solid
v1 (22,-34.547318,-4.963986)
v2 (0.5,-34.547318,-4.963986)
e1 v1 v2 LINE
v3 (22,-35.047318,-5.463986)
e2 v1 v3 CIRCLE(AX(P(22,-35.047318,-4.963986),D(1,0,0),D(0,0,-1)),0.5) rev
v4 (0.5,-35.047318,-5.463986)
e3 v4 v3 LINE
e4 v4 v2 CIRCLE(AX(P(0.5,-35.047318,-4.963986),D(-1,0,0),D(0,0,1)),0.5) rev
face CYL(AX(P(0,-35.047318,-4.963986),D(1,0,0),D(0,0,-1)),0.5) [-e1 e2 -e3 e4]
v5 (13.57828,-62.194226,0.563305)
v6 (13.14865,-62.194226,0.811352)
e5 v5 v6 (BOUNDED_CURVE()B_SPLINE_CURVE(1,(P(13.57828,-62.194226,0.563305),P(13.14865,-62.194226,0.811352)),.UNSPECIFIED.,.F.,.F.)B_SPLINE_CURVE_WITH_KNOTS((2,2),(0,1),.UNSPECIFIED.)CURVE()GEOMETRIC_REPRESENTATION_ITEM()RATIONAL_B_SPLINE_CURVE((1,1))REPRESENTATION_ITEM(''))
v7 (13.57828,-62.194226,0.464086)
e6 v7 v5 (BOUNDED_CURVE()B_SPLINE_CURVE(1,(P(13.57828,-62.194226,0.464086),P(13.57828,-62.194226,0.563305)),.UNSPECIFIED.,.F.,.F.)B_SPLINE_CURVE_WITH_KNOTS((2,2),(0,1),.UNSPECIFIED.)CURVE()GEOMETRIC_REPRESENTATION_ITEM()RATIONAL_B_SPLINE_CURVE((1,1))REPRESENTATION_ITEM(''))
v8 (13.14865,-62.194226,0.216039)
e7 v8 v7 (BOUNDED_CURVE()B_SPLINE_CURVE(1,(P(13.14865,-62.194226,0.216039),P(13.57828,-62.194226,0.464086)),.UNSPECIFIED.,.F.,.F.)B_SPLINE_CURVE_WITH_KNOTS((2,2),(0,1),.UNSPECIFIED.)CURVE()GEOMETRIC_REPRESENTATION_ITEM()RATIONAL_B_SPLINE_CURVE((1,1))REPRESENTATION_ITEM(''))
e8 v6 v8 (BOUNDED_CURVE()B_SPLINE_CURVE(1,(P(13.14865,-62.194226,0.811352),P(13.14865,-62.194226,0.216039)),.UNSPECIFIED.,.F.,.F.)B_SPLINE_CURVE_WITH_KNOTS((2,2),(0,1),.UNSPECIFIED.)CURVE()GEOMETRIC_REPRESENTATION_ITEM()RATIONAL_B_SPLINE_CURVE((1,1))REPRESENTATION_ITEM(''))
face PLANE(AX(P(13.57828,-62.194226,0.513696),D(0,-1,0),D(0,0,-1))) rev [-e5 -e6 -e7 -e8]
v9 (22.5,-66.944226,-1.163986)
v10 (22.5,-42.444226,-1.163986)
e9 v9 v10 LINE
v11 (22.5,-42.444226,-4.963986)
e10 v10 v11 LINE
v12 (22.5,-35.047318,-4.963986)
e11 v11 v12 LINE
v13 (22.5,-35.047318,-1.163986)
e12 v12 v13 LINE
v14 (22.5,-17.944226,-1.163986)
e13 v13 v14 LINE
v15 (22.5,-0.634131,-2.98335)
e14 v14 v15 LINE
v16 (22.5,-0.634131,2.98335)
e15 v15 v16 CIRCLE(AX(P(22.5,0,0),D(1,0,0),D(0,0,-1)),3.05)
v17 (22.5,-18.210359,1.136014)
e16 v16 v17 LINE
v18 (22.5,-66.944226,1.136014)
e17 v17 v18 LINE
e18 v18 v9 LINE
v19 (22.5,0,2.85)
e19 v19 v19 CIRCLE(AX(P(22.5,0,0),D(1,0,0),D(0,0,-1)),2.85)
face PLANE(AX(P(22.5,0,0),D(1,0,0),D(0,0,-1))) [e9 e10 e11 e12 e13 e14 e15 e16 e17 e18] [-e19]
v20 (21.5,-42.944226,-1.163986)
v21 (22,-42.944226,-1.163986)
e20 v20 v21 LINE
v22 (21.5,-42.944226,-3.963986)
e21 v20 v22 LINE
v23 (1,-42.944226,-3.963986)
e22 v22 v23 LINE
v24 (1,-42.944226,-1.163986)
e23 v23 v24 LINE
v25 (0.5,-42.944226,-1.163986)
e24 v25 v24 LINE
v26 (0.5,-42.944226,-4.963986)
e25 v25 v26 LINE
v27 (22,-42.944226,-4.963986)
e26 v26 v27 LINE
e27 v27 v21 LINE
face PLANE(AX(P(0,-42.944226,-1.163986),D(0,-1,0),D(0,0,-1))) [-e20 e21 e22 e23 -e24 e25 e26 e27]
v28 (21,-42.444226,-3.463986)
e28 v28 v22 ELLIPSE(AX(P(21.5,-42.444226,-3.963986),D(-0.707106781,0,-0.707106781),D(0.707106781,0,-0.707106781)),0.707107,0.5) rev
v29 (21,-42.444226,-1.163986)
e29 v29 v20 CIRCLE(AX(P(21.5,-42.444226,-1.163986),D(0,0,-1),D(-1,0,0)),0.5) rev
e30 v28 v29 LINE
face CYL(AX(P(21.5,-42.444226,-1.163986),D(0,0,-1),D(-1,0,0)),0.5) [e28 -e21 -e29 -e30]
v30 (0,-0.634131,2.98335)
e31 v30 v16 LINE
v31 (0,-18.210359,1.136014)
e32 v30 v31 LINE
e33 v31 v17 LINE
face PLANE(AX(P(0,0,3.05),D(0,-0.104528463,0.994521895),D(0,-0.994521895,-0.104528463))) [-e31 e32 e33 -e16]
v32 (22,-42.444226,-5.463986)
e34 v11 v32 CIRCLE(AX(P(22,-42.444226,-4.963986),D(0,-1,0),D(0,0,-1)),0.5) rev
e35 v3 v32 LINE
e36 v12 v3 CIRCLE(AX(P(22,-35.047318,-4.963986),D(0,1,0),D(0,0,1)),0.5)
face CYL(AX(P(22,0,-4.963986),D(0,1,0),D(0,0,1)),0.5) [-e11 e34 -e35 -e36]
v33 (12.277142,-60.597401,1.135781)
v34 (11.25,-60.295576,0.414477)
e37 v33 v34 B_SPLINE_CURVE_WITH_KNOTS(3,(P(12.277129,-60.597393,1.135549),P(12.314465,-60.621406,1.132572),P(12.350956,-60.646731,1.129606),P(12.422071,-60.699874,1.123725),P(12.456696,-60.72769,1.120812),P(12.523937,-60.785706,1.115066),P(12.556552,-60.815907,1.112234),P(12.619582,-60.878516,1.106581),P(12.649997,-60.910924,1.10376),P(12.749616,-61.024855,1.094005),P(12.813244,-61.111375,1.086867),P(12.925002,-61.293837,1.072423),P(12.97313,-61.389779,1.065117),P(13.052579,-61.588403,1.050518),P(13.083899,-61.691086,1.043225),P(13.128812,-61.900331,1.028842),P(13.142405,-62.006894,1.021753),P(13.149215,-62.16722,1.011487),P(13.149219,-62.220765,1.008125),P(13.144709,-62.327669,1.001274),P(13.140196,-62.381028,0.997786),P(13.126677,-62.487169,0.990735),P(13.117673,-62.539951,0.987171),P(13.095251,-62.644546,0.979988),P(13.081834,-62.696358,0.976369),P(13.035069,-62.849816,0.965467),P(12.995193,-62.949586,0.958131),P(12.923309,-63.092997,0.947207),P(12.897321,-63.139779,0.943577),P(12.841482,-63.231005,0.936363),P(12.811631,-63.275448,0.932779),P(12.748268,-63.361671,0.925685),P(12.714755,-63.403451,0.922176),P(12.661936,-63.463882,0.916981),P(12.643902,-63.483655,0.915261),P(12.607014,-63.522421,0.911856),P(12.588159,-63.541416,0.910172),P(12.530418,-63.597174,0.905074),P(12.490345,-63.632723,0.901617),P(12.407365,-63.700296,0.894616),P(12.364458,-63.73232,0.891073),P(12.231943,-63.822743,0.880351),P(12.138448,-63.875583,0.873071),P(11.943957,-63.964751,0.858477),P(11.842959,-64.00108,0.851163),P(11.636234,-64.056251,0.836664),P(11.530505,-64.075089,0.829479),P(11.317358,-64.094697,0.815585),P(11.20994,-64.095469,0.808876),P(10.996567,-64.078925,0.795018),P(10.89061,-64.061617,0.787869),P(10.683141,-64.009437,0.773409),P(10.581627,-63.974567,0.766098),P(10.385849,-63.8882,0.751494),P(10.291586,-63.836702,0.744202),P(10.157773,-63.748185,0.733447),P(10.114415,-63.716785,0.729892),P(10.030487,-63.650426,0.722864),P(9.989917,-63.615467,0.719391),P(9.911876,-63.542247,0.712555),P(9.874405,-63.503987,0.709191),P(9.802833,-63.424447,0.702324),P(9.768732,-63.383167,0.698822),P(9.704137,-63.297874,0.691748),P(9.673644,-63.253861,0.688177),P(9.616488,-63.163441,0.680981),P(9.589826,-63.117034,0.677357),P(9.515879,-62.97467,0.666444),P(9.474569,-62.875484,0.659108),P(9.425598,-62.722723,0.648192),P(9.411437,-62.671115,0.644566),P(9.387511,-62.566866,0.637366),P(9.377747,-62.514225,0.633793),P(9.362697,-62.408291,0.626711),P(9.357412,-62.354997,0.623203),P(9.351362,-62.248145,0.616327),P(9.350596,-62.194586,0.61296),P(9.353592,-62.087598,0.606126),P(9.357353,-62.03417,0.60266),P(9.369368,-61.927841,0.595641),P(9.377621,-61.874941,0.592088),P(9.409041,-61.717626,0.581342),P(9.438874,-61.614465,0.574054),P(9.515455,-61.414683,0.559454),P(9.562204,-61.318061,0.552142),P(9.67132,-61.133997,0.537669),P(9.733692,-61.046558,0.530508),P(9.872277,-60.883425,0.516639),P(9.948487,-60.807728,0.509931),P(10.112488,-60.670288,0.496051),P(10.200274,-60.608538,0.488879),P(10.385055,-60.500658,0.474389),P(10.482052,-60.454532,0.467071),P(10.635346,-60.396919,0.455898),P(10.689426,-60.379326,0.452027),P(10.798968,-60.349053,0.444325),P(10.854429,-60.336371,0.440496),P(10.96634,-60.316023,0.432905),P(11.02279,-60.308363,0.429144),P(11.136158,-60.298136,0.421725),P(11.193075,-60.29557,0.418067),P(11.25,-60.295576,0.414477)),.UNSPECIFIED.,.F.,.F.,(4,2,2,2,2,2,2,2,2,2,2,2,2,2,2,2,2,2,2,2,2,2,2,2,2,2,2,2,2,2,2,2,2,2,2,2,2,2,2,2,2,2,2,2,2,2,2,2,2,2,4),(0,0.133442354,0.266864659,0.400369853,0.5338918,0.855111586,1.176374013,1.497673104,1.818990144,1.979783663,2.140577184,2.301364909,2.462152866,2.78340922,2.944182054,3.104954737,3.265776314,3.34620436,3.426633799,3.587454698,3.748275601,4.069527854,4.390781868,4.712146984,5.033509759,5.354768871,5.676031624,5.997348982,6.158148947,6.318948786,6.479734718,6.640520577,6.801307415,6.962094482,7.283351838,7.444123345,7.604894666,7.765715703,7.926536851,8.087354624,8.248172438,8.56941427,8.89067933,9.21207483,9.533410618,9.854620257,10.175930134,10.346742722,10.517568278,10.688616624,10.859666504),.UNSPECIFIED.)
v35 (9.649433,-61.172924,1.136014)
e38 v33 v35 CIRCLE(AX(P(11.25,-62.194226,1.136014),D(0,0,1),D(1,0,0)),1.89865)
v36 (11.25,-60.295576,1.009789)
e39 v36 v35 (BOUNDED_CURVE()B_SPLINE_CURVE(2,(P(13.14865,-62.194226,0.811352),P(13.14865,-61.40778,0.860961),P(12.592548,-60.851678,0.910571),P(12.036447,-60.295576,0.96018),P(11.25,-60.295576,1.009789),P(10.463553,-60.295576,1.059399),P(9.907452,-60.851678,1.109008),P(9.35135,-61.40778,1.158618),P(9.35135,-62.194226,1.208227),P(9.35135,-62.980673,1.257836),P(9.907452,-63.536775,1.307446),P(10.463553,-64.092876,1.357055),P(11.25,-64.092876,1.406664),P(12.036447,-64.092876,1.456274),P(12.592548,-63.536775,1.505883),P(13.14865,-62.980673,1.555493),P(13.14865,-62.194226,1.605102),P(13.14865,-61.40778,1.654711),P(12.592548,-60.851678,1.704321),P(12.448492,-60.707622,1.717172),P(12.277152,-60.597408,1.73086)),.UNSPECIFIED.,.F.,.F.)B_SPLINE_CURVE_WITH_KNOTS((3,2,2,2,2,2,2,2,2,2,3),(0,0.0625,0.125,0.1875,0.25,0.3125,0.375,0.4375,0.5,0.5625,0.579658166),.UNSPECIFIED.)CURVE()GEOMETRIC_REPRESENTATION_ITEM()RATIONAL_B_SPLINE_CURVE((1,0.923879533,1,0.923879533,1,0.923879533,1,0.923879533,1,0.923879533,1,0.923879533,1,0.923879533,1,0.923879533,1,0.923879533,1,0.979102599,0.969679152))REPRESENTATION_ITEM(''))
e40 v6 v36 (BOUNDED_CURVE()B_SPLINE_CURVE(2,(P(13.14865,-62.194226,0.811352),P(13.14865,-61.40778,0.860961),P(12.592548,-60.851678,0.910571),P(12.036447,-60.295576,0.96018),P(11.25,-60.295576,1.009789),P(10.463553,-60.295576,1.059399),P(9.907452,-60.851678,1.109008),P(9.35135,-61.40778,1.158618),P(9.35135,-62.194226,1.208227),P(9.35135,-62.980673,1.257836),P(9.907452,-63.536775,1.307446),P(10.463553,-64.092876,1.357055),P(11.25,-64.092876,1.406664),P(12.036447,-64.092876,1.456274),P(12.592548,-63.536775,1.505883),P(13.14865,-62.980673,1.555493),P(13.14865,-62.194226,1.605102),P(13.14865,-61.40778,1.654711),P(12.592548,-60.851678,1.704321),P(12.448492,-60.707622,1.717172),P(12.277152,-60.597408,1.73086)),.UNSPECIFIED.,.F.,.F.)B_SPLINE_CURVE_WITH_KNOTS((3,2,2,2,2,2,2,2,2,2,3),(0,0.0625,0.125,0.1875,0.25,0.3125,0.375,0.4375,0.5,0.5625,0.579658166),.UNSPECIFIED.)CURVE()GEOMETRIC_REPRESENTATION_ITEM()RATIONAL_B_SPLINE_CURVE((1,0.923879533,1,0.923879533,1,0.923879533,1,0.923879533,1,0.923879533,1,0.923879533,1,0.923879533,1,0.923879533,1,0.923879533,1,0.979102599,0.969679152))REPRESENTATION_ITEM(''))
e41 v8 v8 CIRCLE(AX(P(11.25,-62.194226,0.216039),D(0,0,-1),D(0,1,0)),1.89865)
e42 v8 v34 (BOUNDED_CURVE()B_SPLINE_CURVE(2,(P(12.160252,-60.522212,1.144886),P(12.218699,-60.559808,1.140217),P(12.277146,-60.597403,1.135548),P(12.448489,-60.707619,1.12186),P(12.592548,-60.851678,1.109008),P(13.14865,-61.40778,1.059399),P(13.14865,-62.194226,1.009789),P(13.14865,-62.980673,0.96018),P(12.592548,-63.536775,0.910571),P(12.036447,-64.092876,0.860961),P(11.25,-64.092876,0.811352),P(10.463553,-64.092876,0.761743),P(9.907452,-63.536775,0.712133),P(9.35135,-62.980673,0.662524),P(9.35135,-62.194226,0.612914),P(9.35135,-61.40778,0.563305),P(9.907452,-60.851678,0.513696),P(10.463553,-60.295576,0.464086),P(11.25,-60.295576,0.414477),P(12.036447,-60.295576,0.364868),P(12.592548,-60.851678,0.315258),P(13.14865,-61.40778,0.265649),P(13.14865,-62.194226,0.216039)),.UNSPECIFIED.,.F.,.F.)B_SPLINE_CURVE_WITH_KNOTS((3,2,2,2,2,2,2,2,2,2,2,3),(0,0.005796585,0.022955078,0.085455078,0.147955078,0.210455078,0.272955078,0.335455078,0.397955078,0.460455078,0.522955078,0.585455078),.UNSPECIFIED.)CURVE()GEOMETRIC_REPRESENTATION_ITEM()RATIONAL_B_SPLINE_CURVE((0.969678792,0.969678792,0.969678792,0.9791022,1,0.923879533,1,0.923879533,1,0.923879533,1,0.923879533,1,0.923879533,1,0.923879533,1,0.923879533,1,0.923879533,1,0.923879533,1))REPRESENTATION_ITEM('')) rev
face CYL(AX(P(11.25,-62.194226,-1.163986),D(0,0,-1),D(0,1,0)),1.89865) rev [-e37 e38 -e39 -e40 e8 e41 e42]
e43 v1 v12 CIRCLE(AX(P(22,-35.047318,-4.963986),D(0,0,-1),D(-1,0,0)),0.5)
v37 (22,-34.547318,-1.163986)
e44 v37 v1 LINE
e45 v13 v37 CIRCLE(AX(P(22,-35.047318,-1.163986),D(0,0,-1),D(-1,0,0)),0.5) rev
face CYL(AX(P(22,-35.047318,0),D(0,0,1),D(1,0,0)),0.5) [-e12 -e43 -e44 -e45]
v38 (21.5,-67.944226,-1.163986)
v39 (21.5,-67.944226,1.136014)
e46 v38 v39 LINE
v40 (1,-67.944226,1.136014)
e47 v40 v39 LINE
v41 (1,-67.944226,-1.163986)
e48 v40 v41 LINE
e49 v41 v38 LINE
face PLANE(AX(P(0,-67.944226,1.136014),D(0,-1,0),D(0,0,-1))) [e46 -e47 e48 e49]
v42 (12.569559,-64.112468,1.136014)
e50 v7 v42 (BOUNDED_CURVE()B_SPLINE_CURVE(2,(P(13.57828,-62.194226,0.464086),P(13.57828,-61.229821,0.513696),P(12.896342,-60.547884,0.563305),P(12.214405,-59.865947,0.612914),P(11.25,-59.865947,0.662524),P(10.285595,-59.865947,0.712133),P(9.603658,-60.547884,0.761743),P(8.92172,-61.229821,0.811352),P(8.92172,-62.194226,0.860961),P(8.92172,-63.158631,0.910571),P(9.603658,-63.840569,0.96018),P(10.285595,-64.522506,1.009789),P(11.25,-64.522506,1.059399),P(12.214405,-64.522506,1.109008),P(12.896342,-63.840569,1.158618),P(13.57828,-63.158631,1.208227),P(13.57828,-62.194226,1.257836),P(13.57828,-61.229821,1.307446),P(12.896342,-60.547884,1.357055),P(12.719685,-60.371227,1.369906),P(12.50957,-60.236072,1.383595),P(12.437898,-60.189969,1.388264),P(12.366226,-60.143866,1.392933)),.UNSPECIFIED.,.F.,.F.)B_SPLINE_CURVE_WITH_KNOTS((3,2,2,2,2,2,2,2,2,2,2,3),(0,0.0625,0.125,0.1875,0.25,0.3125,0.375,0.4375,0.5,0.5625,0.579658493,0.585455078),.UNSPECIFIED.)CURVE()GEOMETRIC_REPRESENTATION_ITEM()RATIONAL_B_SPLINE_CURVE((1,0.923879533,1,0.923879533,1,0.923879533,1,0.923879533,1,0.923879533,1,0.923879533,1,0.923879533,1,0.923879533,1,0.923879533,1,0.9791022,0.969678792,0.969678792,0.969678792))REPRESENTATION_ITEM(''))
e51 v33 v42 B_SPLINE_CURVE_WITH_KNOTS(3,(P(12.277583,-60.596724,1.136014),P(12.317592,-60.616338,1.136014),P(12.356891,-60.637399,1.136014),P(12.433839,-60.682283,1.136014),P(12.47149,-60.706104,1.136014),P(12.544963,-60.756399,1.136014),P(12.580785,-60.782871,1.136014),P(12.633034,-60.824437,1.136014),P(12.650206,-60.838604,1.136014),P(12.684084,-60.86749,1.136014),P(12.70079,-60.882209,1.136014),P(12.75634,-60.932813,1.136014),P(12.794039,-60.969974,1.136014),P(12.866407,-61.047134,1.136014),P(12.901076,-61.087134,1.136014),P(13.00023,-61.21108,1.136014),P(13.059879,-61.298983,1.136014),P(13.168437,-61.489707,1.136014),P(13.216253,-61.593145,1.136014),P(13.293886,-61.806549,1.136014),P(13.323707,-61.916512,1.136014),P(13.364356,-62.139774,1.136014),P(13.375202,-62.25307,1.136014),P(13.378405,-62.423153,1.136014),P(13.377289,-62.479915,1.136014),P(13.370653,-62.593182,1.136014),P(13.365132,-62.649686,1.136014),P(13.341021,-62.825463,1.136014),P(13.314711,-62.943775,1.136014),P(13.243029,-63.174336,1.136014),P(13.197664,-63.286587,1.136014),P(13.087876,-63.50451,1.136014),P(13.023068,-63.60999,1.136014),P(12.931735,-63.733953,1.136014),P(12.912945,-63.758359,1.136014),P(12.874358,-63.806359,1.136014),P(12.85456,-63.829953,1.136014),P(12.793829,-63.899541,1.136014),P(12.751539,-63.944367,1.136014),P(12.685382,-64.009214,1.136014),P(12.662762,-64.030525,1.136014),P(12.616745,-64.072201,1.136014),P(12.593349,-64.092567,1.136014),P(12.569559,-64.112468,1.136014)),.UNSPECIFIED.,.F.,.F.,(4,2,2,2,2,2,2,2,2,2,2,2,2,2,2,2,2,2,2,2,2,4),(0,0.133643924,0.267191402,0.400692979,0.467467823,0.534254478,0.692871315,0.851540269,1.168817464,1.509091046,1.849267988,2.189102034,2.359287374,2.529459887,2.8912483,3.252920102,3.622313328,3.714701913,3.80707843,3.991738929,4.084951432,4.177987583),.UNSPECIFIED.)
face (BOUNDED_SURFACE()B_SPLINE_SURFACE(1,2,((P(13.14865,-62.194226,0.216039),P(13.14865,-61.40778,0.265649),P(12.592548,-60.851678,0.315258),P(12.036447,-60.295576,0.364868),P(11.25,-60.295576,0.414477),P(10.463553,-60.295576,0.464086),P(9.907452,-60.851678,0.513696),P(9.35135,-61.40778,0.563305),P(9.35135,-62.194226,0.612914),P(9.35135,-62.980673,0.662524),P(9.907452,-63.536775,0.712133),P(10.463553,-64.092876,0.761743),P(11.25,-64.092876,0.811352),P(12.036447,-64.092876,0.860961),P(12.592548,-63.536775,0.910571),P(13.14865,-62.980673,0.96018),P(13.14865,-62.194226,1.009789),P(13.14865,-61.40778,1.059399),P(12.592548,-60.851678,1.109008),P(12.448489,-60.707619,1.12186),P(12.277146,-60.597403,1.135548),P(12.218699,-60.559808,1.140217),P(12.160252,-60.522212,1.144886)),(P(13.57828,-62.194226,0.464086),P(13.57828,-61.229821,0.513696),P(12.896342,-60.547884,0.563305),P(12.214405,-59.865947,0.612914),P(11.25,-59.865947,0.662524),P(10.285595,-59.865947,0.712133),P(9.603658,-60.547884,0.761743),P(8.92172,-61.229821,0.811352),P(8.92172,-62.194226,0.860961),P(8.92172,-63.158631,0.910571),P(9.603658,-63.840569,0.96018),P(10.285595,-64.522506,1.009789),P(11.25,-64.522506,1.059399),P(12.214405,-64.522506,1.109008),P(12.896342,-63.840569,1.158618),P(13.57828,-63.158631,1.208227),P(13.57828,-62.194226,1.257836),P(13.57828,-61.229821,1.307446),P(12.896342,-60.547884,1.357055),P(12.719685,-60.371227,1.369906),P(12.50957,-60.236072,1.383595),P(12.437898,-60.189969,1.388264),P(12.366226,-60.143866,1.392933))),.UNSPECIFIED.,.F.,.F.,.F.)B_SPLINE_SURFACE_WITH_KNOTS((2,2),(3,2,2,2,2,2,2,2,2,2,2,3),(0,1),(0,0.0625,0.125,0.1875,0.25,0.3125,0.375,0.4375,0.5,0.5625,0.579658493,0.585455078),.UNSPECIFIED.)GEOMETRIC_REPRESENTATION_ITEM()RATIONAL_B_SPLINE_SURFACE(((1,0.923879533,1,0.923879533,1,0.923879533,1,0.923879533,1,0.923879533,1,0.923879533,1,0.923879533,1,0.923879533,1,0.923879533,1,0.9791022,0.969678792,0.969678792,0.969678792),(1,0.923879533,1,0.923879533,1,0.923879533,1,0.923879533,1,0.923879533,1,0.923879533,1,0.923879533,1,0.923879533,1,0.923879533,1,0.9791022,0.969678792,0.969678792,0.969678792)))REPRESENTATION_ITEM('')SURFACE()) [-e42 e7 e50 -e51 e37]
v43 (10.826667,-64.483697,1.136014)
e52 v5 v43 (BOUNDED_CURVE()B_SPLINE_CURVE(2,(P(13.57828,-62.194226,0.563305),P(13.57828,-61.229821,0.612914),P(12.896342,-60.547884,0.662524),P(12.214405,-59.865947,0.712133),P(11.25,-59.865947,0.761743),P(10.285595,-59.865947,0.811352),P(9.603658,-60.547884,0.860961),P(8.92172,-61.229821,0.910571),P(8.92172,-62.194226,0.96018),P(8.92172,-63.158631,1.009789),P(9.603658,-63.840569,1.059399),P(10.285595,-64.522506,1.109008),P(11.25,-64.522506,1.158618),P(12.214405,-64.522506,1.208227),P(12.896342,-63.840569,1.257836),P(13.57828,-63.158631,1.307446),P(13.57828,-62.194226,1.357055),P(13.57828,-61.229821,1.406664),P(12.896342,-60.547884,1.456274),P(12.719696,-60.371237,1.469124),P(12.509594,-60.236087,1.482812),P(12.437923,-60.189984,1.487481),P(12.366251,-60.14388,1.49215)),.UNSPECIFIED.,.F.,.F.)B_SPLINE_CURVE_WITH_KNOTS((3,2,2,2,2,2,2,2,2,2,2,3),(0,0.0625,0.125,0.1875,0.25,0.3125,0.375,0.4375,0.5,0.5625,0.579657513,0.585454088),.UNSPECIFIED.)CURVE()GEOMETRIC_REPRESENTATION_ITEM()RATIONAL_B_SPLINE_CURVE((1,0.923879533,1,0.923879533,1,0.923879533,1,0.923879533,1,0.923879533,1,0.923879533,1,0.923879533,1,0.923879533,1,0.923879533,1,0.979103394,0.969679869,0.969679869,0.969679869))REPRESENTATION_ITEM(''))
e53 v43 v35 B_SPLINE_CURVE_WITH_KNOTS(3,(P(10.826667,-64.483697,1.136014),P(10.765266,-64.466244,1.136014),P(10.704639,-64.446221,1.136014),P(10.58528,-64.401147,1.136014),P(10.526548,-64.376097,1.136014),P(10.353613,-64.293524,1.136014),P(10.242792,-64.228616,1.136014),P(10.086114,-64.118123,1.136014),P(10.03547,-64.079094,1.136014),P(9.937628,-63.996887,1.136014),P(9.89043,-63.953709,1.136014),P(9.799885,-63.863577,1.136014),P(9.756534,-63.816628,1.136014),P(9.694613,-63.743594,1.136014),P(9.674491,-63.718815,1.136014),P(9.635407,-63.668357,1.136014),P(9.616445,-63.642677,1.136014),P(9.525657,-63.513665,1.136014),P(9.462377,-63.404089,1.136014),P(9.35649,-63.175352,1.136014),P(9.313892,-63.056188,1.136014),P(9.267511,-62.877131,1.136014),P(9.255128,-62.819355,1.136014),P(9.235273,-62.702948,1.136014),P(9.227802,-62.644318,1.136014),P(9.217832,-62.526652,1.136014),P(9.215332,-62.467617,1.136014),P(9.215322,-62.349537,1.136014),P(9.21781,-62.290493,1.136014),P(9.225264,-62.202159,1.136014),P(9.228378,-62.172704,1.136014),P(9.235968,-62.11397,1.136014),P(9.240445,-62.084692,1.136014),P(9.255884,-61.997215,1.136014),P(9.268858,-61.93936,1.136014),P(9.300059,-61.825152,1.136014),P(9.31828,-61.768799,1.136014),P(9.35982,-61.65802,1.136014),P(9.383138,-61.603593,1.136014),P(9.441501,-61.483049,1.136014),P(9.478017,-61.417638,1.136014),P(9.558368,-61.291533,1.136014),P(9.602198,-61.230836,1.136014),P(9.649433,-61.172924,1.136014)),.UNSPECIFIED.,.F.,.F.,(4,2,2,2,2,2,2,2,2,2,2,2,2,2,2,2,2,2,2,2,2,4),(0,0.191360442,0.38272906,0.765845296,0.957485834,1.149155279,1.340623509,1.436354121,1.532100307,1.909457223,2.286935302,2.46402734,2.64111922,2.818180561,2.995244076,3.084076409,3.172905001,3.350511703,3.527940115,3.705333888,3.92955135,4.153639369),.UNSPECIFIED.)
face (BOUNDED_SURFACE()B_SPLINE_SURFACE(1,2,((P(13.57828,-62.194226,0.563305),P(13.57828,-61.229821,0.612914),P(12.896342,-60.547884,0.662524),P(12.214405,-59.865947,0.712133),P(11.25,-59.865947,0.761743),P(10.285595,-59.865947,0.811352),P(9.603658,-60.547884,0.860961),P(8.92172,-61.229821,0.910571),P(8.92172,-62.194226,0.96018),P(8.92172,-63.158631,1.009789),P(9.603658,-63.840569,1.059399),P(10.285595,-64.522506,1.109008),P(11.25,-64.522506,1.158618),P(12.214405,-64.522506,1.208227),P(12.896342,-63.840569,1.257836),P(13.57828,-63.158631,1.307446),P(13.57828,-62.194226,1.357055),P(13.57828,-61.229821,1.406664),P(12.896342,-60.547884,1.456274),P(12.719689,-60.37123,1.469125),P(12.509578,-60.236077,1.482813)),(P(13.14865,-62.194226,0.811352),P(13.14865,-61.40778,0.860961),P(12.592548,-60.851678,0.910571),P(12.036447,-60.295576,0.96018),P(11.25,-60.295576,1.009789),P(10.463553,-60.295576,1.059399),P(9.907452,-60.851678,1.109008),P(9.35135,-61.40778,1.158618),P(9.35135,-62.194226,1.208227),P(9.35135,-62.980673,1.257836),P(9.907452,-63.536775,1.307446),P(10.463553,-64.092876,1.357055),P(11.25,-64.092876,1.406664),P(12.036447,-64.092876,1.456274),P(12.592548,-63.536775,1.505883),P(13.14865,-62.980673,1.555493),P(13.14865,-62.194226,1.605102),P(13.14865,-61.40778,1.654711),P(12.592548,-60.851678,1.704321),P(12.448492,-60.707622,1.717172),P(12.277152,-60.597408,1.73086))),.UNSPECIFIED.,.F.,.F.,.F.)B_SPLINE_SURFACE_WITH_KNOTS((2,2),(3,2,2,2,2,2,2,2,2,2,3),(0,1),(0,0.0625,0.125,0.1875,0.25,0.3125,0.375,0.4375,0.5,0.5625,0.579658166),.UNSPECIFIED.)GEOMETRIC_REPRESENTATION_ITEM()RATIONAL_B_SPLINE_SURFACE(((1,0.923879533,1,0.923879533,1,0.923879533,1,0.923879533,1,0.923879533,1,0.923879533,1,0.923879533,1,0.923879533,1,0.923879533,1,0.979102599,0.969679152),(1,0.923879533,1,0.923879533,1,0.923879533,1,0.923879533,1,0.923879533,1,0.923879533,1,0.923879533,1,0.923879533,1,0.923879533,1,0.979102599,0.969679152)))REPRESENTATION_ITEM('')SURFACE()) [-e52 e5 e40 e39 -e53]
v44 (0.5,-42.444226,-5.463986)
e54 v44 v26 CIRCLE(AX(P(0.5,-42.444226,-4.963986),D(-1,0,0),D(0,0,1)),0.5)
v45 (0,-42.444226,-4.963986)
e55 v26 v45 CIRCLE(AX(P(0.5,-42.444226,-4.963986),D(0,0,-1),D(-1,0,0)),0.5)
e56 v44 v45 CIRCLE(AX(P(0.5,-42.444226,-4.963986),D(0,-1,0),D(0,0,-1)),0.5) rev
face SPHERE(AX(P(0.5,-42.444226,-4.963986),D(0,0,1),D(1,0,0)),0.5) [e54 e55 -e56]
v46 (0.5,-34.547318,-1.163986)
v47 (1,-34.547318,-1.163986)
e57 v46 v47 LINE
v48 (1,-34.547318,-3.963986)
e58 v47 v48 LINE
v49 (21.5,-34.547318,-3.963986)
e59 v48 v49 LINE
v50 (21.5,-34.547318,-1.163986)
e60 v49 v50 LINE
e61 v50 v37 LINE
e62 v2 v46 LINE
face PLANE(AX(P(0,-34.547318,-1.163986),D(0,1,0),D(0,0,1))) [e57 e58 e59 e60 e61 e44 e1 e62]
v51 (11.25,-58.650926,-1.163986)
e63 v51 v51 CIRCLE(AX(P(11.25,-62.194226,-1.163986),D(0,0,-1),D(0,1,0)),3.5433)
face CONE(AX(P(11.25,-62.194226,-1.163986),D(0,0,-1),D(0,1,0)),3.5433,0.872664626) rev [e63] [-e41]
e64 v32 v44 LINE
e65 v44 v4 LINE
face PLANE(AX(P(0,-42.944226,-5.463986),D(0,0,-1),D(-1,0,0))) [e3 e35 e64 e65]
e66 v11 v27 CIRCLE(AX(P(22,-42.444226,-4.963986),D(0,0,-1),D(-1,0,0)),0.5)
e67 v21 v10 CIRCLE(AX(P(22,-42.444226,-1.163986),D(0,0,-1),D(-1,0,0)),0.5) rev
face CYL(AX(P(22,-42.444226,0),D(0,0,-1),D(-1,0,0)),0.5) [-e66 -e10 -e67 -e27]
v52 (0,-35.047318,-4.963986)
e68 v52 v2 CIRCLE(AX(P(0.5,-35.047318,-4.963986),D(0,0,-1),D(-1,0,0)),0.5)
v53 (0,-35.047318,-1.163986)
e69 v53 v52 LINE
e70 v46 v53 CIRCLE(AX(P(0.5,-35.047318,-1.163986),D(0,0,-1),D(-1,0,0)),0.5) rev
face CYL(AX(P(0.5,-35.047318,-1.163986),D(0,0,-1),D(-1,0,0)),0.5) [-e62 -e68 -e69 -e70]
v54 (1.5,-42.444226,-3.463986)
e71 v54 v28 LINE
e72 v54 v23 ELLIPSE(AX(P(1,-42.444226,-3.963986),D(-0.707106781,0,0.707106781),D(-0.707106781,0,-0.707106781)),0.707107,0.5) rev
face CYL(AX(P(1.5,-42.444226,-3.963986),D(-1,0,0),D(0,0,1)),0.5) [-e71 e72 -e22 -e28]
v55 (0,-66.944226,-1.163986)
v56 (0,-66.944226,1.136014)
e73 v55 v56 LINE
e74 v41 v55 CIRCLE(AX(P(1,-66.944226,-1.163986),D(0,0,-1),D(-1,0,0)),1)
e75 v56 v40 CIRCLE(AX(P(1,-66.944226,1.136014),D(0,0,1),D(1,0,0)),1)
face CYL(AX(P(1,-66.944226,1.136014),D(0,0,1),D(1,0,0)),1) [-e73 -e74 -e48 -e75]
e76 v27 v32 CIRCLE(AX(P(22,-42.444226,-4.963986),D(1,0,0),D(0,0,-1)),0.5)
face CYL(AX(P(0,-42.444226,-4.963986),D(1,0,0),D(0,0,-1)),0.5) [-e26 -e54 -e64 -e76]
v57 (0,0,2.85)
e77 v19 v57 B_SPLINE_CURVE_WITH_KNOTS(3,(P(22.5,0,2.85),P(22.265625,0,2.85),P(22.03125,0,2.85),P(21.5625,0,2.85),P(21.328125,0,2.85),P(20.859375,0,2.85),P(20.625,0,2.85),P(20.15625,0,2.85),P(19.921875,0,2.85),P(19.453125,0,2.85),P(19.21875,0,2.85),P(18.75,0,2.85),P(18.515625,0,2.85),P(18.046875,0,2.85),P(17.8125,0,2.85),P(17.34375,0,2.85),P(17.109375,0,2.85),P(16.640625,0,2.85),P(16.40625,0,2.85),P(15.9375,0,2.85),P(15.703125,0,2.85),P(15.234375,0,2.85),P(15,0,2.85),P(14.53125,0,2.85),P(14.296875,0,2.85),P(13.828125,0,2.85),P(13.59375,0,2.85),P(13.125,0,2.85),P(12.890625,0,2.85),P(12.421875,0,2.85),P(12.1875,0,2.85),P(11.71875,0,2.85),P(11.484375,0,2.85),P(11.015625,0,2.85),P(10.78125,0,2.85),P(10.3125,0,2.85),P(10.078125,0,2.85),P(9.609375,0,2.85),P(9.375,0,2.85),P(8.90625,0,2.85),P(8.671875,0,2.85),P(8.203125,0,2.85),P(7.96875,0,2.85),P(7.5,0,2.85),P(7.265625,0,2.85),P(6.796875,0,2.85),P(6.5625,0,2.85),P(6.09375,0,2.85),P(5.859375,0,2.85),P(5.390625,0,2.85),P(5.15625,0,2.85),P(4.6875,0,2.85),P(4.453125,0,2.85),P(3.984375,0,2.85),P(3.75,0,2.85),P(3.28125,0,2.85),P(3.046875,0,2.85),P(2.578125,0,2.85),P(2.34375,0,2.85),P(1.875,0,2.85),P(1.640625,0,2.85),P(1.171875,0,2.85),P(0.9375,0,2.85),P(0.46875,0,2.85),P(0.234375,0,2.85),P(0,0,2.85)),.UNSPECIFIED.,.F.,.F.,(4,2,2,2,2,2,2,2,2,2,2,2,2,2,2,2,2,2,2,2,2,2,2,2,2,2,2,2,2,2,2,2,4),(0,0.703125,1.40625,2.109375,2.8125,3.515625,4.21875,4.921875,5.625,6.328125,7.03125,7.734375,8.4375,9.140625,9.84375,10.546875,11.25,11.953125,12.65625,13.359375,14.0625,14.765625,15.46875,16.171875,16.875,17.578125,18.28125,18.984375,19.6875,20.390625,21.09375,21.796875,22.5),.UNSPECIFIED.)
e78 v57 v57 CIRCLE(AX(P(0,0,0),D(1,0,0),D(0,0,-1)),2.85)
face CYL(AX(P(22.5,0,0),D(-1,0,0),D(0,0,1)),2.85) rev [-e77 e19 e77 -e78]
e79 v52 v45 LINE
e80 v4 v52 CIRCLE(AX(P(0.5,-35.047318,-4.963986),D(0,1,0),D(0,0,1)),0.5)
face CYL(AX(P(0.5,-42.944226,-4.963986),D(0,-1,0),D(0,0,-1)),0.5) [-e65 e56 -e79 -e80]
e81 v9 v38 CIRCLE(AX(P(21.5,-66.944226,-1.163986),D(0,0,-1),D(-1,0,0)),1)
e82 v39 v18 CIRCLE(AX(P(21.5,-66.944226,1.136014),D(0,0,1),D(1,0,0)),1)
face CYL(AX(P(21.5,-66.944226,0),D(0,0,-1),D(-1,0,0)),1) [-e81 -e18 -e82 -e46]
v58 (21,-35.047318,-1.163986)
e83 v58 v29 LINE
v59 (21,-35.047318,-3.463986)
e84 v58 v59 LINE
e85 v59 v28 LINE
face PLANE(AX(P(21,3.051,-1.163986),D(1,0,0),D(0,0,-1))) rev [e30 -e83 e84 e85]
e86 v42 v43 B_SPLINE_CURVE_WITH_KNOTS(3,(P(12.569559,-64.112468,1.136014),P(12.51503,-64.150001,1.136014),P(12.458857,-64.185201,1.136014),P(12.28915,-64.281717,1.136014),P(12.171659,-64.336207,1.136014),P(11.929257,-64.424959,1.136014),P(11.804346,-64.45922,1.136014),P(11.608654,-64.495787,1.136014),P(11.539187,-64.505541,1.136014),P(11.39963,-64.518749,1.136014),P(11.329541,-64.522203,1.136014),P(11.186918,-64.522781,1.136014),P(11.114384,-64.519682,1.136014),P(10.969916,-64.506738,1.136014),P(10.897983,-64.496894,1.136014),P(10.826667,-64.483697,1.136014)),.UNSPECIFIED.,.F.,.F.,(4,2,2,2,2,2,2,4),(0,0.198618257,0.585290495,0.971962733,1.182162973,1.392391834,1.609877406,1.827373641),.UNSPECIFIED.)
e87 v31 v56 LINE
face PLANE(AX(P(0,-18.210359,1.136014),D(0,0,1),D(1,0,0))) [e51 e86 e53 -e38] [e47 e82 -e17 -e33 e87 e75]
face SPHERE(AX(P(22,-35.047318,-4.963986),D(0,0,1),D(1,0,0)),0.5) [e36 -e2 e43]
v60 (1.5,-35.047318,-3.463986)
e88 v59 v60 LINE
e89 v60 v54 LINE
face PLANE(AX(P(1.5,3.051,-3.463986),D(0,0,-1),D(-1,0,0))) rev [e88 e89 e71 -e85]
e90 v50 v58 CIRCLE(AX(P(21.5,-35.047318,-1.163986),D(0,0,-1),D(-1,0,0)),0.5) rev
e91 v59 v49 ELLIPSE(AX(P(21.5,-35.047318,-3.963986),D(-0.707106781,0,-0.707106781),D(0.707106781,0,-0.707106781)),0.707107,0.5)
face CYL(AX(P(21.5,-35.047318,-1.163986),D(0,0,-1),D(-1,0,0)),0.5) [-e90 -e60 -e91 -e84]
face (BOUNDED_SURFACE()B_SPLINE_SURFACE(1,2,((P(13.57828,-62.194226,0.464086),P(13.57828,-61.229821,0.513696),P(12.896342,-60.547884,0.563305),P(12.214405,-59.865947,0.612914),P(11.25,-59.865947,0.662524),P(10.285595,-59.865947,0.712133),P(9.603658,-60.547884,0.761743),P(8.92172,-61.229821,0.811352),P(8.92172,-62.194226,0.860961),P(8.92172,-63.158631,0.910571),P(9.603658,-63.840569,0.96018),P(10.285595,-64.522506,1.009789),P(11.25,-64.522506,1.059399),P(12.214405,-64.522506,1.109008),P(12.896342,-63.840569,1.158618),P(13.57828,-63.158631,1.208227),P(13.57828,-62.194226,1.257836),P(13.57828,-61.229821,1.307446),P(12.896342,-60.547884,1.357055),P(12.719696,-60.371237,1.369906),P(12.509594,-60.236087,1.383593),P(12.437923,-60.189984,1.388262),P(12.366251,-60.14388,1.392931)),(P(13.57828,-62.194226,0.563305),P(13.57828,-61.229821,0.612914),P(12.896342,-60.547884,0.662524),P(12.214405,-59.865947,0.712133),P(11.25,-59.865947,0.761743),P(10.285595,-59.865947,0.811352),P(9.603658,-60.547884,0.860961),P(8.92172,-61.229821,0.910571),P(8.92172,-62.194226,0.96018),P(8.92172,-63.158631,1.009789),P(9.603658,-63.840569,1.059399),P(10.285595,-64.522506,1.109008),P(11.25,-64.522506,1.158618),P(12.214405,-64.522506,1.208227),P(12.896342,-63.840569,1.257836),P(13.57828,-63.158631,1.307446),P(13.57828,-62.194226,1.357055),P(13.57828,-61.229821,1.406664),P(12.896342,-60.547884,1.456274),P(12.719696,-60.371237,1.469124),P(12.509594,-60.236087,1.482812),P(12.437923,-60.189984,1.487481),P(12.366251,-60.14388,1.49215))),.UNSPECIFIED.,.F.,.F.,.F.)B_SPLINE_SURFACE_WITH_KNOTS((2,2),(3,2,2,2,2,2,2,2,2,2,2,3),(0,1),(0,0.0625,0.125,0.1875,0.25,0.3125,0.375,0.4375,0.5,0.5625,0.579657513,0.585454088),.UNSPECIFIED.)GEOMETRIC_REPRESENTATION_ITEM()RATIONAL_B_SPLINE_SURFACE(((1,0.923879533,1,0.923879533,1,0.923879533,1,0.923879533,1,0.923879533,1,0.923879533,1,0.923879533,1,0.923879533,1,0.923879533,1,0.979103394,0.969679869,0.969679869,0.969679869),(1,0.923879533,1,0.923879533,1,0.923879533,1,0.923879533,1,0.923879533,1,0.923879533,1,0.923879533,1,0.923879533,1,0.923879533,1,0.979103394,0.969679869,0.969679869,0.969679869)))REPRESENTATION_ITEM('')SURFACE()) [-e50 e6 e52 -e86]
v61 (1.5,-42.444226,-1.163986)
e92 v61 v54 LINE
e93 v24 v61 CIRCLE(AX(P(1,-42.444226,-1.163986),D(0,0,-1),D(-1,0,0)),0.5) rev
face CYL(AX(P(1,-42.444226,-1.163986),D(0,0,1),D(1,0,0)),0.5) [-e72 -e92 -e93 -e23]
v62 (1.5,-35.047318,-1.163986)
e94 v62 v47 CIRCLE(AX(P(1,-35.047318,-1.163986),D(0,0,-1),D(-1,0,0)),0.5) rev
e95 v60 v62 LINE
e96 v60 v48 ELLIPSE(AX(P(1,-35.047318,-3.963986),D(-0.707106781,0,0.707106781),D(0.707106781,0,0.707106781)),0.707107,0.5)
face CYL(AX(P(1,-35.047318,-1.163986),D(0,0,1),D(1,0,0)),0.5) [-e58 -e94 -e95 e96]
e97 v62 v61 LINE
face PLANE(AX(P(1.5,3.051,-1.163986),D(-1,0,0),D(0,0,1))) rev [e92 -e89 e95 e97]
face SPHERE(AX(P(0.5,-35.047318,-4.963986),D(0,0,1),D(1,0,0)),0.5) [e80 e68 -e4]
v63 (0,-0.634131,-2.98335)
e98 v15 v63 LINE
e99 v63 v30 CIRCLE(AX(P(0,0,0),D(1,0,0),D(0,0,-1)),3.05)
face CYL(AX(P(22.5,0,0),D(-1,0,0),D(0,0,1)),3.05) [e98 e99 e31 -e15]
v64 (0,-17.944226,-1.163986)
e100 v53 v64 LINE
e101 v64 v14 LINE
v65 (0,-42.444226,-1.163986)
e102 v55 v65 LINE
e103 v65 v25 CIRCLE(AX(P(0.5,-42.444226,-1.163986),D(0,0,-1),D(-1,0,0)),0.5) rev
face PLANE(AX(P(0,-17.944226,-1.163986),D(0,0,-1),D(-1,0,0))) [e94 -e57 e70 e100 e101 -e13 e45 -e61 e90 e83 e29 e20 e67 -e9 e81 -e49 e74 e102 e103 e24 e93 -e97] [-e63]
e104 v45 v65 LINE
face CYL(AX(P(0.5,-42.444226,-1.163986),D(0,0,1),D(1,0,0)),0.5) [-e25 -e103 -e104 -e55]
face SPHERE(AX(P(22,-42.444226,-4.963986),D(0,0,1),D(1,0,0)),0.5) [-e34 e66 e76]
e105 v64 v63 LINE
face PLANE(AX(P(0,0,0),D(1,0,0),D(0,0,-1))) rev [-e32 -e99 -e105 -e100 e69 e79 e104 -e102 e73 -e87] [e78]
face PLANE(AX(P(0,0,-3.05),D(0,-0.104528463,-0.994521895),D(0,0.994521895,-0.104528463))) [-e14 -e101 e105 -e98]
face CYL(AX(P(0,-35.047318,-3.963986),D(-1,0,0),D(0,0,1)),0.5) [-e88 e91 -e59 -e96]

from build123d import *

# Parameters (mm, degrees)
SKETCH1_R           = 3.05
SKETCH1_R_2         = 2.85
BOSS_EXTRUDE1_DEPTH = 22.5
THREAD1_PITCH       = 0.79375
CUT_EXTRUDE1_REACH  = 73.638
SKETCH12_R          = 2.85
SKETCH13_W          = 4.3
SKETCH13_H          = 8.396908484
BOSS_EXTRUDE2_DEPTH = 22.5
CUT_EXTRUDE2_REACH  = 53.493
SKETCH14_W          = 19.5
SKETCH14_H          = 2.3
FILLET1_R           = 1
FILLET2_R           = 0.5


with BuildPart() as part:
    # Sketch1 → Boss-Extrude1 (new body)
    with BuildSketch(Plane(origin=(0, 0, 0), x_dir=(0, 0, -1), z_dir=(1, 0, 0))):
        with Locations(Location((0, 0, 0), (0, 0, 180))):
            Circle(SKETCH1_R)
        with Locations(Location((0, 0, 0), (0, 0, 180))):
            Circle(SKETCH1_R_2, mode=Mode.SUBTRACT)
    extrude(amount=BOSS_EXTRUDE1_DEPTH)

    # Sweep1: sweep along a path in Sketch4
    with BuildLine(Plane(origin=(0, -2.85, 0), x_dir=(-1, 0, 0), z_dir=(0, -1, 0))) as sweep1_path:
        Line((0, 0), (-22.5, 0))
    # Sketch3 → Sweep1 (sweep)
    with BuildSketch(Plane(origin=(0, 0, 0), x_dir=(0, 0, -1), z_dir=(1, 0, 0))):
        Polygon((-3.05, 0), (3.05, 0), (1.163985807, -17.9442264), (1.163985807, -67.9442264), (-1.136014193, -67.9442264), (-1.136014193, -18.210358526), align=None)
    sweep(path=sweep1_path.line)

    # Sketch7 → CSK for #6 Flat Head Machine Screw (100)1 (revolve, cut)
    with BuildSketch(Plane(origin=(11.25, -62.1942264, -1.163985807), x_dir=(0, 1, 0), z_dir=(1, 0, 0))):
        Polygon((0, 0), (0, 2.3), (1.89865, 2.3), (1.89865, 1.380025208), (3.5433, 0), align=None)
    revolve(axis=Axis((11.25, -62.1942264, -7.513985807), (0, 0, 1)), mode=Mode.SUBTRACT)

    # Thread1: the profile of Thread Profile1 profile screwed along a right-hand helix of 1.159023 turns, 8 arcs to a turn; built about Z, then put on its axis
    thread1_z = Axis((0, 0, 0), (0, 0, 1))
    thread1_corners = [(1.89835, 0, -0.000173205), (2.328279788, 0, 0.248046874), (2.328279788, 0, 0.347265624), (1.89835, 0, 0.595485703)]
    with BuildLine(mode=Mode.PRIVATE) as thread1_profile:
        Line(thread1_corners[0], thread1_corners[1])
        Line(thread1_corners[1], thread1_corners[2])
        Line(thread1_corners[2], thread1_corners[3])
        Line(thread1_corners[3], thread1_corners[0])
    thread1_cap = Face(thread1_profile.wire())
    thread1_turn_angles = [0, 22.5, 45, 67.5, 90, 112.5, 135, 157.5, 180, 202.5, 225, 247.5, 270, 292.5, 315, 337.5, 360]
    thread1_turn_weights = [1, 0.9238795325112867, 1, 0.9238795325112867, 1, 0.9238795325112867, 1, 0.9238795325112867, 1, 0.9238795325112867, 1, 0.9238795325112867, 1, 0.9238795325112867, 1, 0.9238795325112867, 1]
    thread1_turn_rails = [Edge.make_bspline([Vector(p[0], p[1], 0).rotate(thread1_z, thread1_turn_angles[k]) / thread1_turn_weights[k] + Vector(0, 0, p[2] + THREAD1_PITCH * thread1_turn_angles[k] / 360) for k in range(17)], [0, 0, 0, 1, 1, 2, 2, 3, 3, 4, 4, 5, 5, 6, 6, 7, 7, 8, 8, 8], 2, thread1_turn_weights) for p in thread1_corners]
    thread1_turn_sides = [Face.make_surface_from_curves(thread1_turn_rails[p[0]], thread1_turn_rails[p[1]]) for p in [(0, 1), (1, 2), (2, 3), (3, 0)]]
    thread1_last_angles = [360, 382.5, 405, 411.124204706, 417.248409411]
    thread1_last_weights = [1, 0.9238795325112867, 1, 0.9942929639578036, 1]
    thread1_last_rails = [Edge.make_bspline([Vector(p[0], p[1], 0).rotate(thread1_z, thread1_last_angles[k]) / thread1_last_weights[k] + Vector(0, 0, p[2] + THREAD1_PITCH * thread1_last_angles[k] / 360) for k in range(5)], [0, 0, 0, 1, 1, 2, 2, 2], 2, thread1_last_weights) for p in thread1_corners]
    thread1_last_sides = [Face.make_surface_from_curves(thread1_last_rails[p[0]], thread1_last_rails[p[1]]) for p in [(0, 1), (1, 2), (2, 3), (3, 0)]]
    thread1 = Plane(origin=(11.25, -62.1942264, 0.216039402), x_dir=(1, 0, 0), z_dir=(0, 0, 1)) * Solid(Shell([*thread1_turn_sides, *thread1_last_sides, thread1_cap, thread1_cap.rotate(thread1_z, 417.248409411).moved(Location((0, 0, THREAD1_PITCH * 417.248409411 / 360)))]))
    add(thread1, mode=Mode.SUBTRACT)

    # Sketch12 → Cut-Extrude1 (cut, up to next)
    with BuildSketch(Plane(origin=(22.5, 0, 0), x_dir=(0, 0, -1), z_dir=(1, 0, 0)), mode=Mode.PRIVATE) as cut_extrude1_sk1:
        with Locations(Location((0, 0, 0), (0, 0, 180))):
            Circle(SKETCH12_R)
    cut_extrude1_tool1 = extrude(cut_extrude1_sk1.sketch, amount=-CUT_EXTRUDE1_REACH, mode=Mode.PRIVATE) & part.part
    add(cut_extrude1_tool1.solids().sort_by_distance((22.5, 0, 0))[0], mode=Mode.SUBTRACT)

    # Sketch13 → Boss-Extrude2 (add)
    with BuildSketch(Plane(origin=(22.5, 0, 0), x_dir=(0, 0, -1), z_dir=(1, 0, 0))):
        with Locations((3.313985807, -38.745772158)):
            Rectangle(SKETCH13_W, SKETCH13_H)
    extrude(amount=-BOSS_EXTRUDE2_DEPTH)

    # Sketch14 → Cut-Extrude2 (cut, up to next)
    with BuildSketch(Plane.XZ.offset(42.9442264), mode=Mode.PRIVATE) as cut_extrude2_sk1:
        with Locations((11.25, -2.313985807)):
            Rectangle(SKETCH14_W, SKETCH14_H)
    cut_extrude2_tool1 = extrude(cut_extrude2_sk1.sketch, amount=-CUT_EXTRUDE2_REACH, mode=Mode.PRIVATE) & part.part
    add(cut_extrude2_tool1.solids().sort_by_distance((11.25, -42.944226, -2.313986))[0], mode=Mode.SUBTRACT)

    # Fillet1
    fillet1_edges = [part.edges().sort_by_distance(p)[0] for p in [
        (22.5, -67.9442264, -0.013985807),
        (0, -67.9442264, -0.013985807),
    ]]
    fillet(fillet1_edges, radius=FILLET1_R)

    # Fillet2
    fillet2_edges = [part.edges().sort_by_distance(p)[0] for p in [
        (0, -34.547317916, -3.313985807),
        (0, -38.745772158, -5.463985807),
        (11.25, -34.547317916, -5.463985807),
        (0, -42.9442264, -3.313985807),
        (11.25, -42.9442264, -5.463985807),
        (22.5, -42.9442264, -3.313985807),
        (22.5, -38.745772158, -5.463985807),
        (22.5, -34.547317916, -3.313985807),
        (1.5, -42.9442264, -2.313985807),
        (11.25, -42.9442264, -3.463985807),
        (21, -42.9442264, -2.313985807),
        (11.25, -34.547317916, -3.463985807),
        (21, -34.547317916, -2.313985807),
        (1.5, -34.547317916, -2.313985807),
    ]]
    fillet(fillet2_edges, radius=FILLET2_R)


solid = part.part
